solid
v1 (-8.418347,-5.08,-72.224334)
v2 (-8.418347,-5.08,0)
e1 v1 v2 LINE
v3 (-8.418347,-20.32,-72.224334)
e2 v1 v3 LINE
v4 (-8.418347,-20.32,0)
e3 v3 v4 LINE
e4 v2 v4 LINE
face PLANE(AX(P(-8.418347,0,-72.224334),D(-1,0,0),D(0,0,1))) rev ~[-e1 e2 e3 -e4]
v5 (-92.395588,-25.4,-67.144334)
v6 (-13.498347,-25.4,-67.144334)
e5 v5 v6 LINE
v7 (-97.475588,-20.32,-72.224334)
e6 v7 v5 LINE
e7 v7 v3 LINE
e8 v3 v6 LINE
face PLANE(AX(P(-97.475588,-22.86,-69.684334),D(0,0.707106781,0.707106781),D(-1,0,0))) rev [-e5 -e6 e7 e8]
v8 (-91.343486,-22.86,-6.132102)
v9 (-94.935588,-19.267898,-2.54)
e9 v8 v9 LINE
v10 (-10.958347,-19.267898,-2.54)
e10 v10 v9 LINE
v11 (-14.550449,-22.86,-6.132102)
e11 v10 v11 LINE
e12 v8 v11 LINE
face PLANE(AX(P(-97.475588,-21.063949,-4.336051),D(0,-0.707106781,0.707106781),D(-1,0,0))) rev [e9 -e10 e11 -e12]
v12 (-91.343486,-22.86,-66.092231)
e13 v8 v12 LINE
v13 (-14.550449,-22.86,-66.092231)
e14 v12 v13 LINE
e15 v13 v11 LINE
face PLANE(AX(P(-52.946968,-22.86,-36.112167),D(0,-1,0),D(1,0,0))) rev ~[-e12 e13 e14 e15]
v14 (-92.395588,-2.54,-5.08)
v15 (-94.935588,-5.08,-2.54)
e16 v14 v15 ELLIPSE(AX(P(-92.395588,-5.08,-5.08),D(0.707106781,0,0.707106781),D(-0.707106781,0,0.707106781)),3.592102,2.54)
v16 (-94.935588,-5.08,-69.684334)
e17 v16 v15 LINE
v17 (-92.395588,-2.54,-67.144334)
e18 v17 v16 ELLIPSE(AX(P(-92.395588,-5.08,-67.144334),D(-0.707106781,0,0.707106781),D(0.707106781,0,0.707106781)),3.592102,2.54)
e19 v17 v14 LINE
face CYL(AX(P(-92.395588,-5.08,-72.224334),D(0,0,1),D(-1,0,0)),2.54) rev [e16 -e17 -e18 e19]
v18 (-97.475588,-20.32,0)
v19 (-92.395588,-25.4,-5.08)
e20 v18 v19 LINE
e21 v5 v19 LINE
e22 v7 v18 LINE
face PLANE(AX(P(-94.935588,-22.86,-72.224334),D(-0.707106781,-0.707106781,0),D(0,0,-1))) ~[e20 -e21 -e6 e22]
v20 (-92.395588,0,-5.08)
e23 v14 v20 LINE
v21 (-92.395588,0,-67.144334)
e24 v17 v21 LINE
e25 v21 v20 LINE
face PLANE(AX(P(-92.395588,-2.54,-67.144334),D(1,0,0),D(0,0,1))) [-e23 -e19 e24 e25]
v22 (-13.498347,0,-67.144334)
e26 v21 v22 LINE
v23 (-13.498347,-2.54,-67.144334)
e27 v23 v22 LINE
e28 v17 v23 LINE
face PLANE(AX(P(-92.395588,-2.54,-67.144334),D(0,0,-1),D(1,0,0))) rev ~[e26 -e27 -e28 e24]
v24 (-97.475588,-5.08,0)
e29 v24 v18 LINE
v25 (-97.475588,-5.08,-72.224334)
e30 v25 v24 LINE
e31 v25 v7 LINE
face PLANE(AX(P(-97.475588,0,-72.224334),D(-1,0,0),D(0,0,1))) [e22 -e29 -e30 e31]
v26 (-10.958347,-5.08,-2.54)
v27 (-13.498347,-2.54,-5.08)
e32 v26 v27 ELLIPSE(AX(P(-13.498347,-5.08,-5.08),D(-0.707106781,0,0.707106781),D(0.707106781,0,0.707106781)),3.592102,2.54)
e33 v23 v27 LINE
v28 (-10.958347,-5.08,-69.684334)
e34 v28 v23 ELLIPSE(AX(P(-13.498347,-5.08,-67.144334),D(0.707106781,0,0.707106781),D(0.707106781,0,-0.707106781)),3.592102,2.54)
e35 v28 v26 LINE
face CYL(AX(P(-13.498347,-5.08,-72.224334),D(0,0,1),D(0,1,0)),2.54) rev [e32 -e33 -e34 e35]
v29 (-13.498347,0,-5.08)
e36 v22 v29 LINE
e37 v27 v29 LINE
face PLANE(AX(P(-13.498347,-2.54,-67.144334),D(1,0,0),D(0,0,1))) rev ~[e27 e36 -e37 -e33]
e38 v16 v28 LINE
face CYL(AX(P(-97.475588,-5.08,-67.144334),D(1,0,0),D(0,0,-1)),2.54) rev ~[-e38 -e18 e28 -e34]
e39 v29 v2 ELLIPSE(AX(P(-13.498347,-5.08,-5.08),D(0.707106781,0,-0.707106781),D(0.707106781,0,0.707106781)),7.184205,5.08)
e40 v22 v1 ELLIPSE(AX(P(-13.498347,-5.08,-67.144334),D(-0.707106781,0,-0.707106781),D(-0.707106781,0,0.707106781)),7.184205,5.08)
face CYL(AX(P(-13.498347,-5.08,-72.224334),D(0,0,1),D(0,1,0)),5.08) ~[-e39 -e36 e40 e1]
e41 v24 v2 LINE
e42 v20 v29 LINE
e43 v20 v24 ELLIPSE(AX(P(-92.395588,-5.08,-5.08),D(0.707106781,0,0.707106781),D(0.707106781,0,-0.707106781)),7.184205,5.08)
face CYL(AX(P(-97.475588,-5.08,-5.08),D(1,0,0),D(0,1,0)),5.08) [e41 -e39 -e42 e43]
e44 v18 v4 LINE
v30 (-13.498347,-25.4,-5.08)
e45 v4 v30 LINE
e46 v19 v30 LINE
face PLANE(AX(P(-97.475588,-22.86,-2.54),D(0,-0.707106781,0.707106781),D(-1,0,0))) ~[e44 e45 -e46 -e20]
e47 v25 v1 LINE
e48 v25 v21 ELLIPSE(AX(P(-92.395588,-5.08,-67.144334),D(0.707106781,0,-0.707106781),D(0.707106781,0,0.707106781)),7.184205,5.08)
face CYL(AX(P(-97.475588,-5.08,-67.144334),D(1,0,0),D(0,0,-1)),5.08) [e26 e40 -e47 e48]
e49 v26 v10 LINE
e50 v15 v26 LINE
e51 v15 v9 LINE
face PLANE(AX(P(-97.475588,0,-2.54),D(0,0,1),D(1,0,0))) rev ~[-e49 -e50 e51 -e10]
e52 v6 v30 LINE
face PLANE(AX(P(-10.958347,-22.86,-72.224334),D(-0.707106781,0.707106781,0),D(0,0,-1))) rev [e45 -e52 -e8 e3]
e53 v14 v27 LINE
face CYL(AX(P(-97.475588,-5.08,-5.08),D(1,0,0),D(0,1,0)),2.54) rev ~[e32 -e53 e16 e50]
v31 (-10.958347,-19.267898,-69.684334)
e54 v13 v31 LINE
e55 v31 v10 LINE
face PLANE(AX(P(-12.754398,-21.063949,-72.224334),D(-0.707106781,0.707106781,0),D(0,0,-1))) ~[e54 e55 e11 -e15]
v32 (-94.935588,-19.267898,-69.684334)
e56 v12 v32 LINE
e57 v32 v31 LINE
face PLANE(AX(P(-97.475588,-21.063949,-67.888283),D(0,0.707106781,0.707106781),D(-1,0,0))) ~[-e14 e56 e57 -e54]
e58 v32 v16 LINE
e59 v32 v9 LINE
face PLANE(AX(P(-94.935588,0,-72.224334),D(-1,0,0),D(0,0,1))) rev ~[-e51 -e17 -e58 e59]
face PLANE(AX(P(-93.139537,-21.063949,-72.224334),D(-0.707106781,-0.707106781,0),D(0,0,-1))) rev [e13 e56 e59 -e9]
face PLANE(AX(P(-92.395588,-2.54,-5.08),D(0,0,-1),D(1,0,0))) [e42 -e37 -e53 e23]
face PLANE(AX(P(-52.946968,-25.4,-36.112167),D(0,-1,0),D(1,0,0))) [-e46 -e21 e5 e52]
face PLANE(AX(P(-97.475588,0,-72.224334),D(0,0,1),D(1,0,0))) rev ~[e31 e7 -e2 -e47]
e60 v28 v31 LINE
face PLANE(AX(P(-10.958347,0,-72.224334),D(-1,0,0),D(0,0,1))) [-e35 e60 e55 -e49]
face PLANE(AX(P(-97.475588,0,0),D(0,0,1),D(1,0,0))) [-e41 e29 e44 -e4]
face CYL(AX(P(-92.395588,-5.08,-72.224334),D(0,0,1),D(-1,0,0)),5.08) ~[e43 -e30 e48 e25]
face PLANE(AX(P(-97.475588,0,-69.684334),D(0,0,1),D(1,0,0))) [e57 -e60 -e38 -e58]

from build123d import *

# Parameters (mm, degrees)
F0_W     = 89.0572415665
F0_H     = 72.2243338823
F1_DEPTH = 25.4
F2_SIZE  = 5.08
F3_R     = 5.08
F4_T     = -2.54


# Not quite as in the source:
# - a shell that OpenCascade refuses in one call is made with other operations: the cavity is built on its own and cut out


with BuildPart() as f1:
    # F0 (on Front) → F1 (new body)
    with BuildSketch(Plane.XZ):
        with Locations((-52.9469675384, -36.1121669412)):
            Rectangle(F0_W, F0_H)
    extrude(amount=F1_DEPTH)

    # F2
    f2_edges = [f1.edges().sort_by_distance(p)[0] for p in [
        (-97.475588, -25.4, -36.112167),
        (-52.946968, -25.4, 0),
        (-8.418347, -25.4, -36.112167),
        (-52.946968, -25.4, -72.224334),
    ]]
    chamfer(f2_edges, length=F2_SIZE)

    # F3
    f3_edges = [f1.edges().sort_by_distance(p)[0] for p in [
        (-8.418347, 0, -36.112167),
        (-52.946968, 0, 0),
        (-97.475588, 0, -36.112167),
        (-52.946968, 0, -72.224334),
    ]]
    fillet(f3_edges, radius=F3_R)

    # F4: a shell. OpenCascade refuses it in one call, so the cavity is built on its own and cut out:
    # the body offset inwards by the wall thickness, plus a prism from it out through each open face.
    f4_core = offset(f1.part, amount=F4_T, mode=Mode.PRIVATE)
    f4_exits = [f4_core.faces().sort_by_distance(p)[0] for p in [
        (-52.946968, -2.54, -36.112167),
    ]]
    add(f4_core, mode=Mode.SUBTRACT)
    extrude(f4_exits, amount=-F4_T, mode=Mode.SUBTRACT)


solid = f1.part
